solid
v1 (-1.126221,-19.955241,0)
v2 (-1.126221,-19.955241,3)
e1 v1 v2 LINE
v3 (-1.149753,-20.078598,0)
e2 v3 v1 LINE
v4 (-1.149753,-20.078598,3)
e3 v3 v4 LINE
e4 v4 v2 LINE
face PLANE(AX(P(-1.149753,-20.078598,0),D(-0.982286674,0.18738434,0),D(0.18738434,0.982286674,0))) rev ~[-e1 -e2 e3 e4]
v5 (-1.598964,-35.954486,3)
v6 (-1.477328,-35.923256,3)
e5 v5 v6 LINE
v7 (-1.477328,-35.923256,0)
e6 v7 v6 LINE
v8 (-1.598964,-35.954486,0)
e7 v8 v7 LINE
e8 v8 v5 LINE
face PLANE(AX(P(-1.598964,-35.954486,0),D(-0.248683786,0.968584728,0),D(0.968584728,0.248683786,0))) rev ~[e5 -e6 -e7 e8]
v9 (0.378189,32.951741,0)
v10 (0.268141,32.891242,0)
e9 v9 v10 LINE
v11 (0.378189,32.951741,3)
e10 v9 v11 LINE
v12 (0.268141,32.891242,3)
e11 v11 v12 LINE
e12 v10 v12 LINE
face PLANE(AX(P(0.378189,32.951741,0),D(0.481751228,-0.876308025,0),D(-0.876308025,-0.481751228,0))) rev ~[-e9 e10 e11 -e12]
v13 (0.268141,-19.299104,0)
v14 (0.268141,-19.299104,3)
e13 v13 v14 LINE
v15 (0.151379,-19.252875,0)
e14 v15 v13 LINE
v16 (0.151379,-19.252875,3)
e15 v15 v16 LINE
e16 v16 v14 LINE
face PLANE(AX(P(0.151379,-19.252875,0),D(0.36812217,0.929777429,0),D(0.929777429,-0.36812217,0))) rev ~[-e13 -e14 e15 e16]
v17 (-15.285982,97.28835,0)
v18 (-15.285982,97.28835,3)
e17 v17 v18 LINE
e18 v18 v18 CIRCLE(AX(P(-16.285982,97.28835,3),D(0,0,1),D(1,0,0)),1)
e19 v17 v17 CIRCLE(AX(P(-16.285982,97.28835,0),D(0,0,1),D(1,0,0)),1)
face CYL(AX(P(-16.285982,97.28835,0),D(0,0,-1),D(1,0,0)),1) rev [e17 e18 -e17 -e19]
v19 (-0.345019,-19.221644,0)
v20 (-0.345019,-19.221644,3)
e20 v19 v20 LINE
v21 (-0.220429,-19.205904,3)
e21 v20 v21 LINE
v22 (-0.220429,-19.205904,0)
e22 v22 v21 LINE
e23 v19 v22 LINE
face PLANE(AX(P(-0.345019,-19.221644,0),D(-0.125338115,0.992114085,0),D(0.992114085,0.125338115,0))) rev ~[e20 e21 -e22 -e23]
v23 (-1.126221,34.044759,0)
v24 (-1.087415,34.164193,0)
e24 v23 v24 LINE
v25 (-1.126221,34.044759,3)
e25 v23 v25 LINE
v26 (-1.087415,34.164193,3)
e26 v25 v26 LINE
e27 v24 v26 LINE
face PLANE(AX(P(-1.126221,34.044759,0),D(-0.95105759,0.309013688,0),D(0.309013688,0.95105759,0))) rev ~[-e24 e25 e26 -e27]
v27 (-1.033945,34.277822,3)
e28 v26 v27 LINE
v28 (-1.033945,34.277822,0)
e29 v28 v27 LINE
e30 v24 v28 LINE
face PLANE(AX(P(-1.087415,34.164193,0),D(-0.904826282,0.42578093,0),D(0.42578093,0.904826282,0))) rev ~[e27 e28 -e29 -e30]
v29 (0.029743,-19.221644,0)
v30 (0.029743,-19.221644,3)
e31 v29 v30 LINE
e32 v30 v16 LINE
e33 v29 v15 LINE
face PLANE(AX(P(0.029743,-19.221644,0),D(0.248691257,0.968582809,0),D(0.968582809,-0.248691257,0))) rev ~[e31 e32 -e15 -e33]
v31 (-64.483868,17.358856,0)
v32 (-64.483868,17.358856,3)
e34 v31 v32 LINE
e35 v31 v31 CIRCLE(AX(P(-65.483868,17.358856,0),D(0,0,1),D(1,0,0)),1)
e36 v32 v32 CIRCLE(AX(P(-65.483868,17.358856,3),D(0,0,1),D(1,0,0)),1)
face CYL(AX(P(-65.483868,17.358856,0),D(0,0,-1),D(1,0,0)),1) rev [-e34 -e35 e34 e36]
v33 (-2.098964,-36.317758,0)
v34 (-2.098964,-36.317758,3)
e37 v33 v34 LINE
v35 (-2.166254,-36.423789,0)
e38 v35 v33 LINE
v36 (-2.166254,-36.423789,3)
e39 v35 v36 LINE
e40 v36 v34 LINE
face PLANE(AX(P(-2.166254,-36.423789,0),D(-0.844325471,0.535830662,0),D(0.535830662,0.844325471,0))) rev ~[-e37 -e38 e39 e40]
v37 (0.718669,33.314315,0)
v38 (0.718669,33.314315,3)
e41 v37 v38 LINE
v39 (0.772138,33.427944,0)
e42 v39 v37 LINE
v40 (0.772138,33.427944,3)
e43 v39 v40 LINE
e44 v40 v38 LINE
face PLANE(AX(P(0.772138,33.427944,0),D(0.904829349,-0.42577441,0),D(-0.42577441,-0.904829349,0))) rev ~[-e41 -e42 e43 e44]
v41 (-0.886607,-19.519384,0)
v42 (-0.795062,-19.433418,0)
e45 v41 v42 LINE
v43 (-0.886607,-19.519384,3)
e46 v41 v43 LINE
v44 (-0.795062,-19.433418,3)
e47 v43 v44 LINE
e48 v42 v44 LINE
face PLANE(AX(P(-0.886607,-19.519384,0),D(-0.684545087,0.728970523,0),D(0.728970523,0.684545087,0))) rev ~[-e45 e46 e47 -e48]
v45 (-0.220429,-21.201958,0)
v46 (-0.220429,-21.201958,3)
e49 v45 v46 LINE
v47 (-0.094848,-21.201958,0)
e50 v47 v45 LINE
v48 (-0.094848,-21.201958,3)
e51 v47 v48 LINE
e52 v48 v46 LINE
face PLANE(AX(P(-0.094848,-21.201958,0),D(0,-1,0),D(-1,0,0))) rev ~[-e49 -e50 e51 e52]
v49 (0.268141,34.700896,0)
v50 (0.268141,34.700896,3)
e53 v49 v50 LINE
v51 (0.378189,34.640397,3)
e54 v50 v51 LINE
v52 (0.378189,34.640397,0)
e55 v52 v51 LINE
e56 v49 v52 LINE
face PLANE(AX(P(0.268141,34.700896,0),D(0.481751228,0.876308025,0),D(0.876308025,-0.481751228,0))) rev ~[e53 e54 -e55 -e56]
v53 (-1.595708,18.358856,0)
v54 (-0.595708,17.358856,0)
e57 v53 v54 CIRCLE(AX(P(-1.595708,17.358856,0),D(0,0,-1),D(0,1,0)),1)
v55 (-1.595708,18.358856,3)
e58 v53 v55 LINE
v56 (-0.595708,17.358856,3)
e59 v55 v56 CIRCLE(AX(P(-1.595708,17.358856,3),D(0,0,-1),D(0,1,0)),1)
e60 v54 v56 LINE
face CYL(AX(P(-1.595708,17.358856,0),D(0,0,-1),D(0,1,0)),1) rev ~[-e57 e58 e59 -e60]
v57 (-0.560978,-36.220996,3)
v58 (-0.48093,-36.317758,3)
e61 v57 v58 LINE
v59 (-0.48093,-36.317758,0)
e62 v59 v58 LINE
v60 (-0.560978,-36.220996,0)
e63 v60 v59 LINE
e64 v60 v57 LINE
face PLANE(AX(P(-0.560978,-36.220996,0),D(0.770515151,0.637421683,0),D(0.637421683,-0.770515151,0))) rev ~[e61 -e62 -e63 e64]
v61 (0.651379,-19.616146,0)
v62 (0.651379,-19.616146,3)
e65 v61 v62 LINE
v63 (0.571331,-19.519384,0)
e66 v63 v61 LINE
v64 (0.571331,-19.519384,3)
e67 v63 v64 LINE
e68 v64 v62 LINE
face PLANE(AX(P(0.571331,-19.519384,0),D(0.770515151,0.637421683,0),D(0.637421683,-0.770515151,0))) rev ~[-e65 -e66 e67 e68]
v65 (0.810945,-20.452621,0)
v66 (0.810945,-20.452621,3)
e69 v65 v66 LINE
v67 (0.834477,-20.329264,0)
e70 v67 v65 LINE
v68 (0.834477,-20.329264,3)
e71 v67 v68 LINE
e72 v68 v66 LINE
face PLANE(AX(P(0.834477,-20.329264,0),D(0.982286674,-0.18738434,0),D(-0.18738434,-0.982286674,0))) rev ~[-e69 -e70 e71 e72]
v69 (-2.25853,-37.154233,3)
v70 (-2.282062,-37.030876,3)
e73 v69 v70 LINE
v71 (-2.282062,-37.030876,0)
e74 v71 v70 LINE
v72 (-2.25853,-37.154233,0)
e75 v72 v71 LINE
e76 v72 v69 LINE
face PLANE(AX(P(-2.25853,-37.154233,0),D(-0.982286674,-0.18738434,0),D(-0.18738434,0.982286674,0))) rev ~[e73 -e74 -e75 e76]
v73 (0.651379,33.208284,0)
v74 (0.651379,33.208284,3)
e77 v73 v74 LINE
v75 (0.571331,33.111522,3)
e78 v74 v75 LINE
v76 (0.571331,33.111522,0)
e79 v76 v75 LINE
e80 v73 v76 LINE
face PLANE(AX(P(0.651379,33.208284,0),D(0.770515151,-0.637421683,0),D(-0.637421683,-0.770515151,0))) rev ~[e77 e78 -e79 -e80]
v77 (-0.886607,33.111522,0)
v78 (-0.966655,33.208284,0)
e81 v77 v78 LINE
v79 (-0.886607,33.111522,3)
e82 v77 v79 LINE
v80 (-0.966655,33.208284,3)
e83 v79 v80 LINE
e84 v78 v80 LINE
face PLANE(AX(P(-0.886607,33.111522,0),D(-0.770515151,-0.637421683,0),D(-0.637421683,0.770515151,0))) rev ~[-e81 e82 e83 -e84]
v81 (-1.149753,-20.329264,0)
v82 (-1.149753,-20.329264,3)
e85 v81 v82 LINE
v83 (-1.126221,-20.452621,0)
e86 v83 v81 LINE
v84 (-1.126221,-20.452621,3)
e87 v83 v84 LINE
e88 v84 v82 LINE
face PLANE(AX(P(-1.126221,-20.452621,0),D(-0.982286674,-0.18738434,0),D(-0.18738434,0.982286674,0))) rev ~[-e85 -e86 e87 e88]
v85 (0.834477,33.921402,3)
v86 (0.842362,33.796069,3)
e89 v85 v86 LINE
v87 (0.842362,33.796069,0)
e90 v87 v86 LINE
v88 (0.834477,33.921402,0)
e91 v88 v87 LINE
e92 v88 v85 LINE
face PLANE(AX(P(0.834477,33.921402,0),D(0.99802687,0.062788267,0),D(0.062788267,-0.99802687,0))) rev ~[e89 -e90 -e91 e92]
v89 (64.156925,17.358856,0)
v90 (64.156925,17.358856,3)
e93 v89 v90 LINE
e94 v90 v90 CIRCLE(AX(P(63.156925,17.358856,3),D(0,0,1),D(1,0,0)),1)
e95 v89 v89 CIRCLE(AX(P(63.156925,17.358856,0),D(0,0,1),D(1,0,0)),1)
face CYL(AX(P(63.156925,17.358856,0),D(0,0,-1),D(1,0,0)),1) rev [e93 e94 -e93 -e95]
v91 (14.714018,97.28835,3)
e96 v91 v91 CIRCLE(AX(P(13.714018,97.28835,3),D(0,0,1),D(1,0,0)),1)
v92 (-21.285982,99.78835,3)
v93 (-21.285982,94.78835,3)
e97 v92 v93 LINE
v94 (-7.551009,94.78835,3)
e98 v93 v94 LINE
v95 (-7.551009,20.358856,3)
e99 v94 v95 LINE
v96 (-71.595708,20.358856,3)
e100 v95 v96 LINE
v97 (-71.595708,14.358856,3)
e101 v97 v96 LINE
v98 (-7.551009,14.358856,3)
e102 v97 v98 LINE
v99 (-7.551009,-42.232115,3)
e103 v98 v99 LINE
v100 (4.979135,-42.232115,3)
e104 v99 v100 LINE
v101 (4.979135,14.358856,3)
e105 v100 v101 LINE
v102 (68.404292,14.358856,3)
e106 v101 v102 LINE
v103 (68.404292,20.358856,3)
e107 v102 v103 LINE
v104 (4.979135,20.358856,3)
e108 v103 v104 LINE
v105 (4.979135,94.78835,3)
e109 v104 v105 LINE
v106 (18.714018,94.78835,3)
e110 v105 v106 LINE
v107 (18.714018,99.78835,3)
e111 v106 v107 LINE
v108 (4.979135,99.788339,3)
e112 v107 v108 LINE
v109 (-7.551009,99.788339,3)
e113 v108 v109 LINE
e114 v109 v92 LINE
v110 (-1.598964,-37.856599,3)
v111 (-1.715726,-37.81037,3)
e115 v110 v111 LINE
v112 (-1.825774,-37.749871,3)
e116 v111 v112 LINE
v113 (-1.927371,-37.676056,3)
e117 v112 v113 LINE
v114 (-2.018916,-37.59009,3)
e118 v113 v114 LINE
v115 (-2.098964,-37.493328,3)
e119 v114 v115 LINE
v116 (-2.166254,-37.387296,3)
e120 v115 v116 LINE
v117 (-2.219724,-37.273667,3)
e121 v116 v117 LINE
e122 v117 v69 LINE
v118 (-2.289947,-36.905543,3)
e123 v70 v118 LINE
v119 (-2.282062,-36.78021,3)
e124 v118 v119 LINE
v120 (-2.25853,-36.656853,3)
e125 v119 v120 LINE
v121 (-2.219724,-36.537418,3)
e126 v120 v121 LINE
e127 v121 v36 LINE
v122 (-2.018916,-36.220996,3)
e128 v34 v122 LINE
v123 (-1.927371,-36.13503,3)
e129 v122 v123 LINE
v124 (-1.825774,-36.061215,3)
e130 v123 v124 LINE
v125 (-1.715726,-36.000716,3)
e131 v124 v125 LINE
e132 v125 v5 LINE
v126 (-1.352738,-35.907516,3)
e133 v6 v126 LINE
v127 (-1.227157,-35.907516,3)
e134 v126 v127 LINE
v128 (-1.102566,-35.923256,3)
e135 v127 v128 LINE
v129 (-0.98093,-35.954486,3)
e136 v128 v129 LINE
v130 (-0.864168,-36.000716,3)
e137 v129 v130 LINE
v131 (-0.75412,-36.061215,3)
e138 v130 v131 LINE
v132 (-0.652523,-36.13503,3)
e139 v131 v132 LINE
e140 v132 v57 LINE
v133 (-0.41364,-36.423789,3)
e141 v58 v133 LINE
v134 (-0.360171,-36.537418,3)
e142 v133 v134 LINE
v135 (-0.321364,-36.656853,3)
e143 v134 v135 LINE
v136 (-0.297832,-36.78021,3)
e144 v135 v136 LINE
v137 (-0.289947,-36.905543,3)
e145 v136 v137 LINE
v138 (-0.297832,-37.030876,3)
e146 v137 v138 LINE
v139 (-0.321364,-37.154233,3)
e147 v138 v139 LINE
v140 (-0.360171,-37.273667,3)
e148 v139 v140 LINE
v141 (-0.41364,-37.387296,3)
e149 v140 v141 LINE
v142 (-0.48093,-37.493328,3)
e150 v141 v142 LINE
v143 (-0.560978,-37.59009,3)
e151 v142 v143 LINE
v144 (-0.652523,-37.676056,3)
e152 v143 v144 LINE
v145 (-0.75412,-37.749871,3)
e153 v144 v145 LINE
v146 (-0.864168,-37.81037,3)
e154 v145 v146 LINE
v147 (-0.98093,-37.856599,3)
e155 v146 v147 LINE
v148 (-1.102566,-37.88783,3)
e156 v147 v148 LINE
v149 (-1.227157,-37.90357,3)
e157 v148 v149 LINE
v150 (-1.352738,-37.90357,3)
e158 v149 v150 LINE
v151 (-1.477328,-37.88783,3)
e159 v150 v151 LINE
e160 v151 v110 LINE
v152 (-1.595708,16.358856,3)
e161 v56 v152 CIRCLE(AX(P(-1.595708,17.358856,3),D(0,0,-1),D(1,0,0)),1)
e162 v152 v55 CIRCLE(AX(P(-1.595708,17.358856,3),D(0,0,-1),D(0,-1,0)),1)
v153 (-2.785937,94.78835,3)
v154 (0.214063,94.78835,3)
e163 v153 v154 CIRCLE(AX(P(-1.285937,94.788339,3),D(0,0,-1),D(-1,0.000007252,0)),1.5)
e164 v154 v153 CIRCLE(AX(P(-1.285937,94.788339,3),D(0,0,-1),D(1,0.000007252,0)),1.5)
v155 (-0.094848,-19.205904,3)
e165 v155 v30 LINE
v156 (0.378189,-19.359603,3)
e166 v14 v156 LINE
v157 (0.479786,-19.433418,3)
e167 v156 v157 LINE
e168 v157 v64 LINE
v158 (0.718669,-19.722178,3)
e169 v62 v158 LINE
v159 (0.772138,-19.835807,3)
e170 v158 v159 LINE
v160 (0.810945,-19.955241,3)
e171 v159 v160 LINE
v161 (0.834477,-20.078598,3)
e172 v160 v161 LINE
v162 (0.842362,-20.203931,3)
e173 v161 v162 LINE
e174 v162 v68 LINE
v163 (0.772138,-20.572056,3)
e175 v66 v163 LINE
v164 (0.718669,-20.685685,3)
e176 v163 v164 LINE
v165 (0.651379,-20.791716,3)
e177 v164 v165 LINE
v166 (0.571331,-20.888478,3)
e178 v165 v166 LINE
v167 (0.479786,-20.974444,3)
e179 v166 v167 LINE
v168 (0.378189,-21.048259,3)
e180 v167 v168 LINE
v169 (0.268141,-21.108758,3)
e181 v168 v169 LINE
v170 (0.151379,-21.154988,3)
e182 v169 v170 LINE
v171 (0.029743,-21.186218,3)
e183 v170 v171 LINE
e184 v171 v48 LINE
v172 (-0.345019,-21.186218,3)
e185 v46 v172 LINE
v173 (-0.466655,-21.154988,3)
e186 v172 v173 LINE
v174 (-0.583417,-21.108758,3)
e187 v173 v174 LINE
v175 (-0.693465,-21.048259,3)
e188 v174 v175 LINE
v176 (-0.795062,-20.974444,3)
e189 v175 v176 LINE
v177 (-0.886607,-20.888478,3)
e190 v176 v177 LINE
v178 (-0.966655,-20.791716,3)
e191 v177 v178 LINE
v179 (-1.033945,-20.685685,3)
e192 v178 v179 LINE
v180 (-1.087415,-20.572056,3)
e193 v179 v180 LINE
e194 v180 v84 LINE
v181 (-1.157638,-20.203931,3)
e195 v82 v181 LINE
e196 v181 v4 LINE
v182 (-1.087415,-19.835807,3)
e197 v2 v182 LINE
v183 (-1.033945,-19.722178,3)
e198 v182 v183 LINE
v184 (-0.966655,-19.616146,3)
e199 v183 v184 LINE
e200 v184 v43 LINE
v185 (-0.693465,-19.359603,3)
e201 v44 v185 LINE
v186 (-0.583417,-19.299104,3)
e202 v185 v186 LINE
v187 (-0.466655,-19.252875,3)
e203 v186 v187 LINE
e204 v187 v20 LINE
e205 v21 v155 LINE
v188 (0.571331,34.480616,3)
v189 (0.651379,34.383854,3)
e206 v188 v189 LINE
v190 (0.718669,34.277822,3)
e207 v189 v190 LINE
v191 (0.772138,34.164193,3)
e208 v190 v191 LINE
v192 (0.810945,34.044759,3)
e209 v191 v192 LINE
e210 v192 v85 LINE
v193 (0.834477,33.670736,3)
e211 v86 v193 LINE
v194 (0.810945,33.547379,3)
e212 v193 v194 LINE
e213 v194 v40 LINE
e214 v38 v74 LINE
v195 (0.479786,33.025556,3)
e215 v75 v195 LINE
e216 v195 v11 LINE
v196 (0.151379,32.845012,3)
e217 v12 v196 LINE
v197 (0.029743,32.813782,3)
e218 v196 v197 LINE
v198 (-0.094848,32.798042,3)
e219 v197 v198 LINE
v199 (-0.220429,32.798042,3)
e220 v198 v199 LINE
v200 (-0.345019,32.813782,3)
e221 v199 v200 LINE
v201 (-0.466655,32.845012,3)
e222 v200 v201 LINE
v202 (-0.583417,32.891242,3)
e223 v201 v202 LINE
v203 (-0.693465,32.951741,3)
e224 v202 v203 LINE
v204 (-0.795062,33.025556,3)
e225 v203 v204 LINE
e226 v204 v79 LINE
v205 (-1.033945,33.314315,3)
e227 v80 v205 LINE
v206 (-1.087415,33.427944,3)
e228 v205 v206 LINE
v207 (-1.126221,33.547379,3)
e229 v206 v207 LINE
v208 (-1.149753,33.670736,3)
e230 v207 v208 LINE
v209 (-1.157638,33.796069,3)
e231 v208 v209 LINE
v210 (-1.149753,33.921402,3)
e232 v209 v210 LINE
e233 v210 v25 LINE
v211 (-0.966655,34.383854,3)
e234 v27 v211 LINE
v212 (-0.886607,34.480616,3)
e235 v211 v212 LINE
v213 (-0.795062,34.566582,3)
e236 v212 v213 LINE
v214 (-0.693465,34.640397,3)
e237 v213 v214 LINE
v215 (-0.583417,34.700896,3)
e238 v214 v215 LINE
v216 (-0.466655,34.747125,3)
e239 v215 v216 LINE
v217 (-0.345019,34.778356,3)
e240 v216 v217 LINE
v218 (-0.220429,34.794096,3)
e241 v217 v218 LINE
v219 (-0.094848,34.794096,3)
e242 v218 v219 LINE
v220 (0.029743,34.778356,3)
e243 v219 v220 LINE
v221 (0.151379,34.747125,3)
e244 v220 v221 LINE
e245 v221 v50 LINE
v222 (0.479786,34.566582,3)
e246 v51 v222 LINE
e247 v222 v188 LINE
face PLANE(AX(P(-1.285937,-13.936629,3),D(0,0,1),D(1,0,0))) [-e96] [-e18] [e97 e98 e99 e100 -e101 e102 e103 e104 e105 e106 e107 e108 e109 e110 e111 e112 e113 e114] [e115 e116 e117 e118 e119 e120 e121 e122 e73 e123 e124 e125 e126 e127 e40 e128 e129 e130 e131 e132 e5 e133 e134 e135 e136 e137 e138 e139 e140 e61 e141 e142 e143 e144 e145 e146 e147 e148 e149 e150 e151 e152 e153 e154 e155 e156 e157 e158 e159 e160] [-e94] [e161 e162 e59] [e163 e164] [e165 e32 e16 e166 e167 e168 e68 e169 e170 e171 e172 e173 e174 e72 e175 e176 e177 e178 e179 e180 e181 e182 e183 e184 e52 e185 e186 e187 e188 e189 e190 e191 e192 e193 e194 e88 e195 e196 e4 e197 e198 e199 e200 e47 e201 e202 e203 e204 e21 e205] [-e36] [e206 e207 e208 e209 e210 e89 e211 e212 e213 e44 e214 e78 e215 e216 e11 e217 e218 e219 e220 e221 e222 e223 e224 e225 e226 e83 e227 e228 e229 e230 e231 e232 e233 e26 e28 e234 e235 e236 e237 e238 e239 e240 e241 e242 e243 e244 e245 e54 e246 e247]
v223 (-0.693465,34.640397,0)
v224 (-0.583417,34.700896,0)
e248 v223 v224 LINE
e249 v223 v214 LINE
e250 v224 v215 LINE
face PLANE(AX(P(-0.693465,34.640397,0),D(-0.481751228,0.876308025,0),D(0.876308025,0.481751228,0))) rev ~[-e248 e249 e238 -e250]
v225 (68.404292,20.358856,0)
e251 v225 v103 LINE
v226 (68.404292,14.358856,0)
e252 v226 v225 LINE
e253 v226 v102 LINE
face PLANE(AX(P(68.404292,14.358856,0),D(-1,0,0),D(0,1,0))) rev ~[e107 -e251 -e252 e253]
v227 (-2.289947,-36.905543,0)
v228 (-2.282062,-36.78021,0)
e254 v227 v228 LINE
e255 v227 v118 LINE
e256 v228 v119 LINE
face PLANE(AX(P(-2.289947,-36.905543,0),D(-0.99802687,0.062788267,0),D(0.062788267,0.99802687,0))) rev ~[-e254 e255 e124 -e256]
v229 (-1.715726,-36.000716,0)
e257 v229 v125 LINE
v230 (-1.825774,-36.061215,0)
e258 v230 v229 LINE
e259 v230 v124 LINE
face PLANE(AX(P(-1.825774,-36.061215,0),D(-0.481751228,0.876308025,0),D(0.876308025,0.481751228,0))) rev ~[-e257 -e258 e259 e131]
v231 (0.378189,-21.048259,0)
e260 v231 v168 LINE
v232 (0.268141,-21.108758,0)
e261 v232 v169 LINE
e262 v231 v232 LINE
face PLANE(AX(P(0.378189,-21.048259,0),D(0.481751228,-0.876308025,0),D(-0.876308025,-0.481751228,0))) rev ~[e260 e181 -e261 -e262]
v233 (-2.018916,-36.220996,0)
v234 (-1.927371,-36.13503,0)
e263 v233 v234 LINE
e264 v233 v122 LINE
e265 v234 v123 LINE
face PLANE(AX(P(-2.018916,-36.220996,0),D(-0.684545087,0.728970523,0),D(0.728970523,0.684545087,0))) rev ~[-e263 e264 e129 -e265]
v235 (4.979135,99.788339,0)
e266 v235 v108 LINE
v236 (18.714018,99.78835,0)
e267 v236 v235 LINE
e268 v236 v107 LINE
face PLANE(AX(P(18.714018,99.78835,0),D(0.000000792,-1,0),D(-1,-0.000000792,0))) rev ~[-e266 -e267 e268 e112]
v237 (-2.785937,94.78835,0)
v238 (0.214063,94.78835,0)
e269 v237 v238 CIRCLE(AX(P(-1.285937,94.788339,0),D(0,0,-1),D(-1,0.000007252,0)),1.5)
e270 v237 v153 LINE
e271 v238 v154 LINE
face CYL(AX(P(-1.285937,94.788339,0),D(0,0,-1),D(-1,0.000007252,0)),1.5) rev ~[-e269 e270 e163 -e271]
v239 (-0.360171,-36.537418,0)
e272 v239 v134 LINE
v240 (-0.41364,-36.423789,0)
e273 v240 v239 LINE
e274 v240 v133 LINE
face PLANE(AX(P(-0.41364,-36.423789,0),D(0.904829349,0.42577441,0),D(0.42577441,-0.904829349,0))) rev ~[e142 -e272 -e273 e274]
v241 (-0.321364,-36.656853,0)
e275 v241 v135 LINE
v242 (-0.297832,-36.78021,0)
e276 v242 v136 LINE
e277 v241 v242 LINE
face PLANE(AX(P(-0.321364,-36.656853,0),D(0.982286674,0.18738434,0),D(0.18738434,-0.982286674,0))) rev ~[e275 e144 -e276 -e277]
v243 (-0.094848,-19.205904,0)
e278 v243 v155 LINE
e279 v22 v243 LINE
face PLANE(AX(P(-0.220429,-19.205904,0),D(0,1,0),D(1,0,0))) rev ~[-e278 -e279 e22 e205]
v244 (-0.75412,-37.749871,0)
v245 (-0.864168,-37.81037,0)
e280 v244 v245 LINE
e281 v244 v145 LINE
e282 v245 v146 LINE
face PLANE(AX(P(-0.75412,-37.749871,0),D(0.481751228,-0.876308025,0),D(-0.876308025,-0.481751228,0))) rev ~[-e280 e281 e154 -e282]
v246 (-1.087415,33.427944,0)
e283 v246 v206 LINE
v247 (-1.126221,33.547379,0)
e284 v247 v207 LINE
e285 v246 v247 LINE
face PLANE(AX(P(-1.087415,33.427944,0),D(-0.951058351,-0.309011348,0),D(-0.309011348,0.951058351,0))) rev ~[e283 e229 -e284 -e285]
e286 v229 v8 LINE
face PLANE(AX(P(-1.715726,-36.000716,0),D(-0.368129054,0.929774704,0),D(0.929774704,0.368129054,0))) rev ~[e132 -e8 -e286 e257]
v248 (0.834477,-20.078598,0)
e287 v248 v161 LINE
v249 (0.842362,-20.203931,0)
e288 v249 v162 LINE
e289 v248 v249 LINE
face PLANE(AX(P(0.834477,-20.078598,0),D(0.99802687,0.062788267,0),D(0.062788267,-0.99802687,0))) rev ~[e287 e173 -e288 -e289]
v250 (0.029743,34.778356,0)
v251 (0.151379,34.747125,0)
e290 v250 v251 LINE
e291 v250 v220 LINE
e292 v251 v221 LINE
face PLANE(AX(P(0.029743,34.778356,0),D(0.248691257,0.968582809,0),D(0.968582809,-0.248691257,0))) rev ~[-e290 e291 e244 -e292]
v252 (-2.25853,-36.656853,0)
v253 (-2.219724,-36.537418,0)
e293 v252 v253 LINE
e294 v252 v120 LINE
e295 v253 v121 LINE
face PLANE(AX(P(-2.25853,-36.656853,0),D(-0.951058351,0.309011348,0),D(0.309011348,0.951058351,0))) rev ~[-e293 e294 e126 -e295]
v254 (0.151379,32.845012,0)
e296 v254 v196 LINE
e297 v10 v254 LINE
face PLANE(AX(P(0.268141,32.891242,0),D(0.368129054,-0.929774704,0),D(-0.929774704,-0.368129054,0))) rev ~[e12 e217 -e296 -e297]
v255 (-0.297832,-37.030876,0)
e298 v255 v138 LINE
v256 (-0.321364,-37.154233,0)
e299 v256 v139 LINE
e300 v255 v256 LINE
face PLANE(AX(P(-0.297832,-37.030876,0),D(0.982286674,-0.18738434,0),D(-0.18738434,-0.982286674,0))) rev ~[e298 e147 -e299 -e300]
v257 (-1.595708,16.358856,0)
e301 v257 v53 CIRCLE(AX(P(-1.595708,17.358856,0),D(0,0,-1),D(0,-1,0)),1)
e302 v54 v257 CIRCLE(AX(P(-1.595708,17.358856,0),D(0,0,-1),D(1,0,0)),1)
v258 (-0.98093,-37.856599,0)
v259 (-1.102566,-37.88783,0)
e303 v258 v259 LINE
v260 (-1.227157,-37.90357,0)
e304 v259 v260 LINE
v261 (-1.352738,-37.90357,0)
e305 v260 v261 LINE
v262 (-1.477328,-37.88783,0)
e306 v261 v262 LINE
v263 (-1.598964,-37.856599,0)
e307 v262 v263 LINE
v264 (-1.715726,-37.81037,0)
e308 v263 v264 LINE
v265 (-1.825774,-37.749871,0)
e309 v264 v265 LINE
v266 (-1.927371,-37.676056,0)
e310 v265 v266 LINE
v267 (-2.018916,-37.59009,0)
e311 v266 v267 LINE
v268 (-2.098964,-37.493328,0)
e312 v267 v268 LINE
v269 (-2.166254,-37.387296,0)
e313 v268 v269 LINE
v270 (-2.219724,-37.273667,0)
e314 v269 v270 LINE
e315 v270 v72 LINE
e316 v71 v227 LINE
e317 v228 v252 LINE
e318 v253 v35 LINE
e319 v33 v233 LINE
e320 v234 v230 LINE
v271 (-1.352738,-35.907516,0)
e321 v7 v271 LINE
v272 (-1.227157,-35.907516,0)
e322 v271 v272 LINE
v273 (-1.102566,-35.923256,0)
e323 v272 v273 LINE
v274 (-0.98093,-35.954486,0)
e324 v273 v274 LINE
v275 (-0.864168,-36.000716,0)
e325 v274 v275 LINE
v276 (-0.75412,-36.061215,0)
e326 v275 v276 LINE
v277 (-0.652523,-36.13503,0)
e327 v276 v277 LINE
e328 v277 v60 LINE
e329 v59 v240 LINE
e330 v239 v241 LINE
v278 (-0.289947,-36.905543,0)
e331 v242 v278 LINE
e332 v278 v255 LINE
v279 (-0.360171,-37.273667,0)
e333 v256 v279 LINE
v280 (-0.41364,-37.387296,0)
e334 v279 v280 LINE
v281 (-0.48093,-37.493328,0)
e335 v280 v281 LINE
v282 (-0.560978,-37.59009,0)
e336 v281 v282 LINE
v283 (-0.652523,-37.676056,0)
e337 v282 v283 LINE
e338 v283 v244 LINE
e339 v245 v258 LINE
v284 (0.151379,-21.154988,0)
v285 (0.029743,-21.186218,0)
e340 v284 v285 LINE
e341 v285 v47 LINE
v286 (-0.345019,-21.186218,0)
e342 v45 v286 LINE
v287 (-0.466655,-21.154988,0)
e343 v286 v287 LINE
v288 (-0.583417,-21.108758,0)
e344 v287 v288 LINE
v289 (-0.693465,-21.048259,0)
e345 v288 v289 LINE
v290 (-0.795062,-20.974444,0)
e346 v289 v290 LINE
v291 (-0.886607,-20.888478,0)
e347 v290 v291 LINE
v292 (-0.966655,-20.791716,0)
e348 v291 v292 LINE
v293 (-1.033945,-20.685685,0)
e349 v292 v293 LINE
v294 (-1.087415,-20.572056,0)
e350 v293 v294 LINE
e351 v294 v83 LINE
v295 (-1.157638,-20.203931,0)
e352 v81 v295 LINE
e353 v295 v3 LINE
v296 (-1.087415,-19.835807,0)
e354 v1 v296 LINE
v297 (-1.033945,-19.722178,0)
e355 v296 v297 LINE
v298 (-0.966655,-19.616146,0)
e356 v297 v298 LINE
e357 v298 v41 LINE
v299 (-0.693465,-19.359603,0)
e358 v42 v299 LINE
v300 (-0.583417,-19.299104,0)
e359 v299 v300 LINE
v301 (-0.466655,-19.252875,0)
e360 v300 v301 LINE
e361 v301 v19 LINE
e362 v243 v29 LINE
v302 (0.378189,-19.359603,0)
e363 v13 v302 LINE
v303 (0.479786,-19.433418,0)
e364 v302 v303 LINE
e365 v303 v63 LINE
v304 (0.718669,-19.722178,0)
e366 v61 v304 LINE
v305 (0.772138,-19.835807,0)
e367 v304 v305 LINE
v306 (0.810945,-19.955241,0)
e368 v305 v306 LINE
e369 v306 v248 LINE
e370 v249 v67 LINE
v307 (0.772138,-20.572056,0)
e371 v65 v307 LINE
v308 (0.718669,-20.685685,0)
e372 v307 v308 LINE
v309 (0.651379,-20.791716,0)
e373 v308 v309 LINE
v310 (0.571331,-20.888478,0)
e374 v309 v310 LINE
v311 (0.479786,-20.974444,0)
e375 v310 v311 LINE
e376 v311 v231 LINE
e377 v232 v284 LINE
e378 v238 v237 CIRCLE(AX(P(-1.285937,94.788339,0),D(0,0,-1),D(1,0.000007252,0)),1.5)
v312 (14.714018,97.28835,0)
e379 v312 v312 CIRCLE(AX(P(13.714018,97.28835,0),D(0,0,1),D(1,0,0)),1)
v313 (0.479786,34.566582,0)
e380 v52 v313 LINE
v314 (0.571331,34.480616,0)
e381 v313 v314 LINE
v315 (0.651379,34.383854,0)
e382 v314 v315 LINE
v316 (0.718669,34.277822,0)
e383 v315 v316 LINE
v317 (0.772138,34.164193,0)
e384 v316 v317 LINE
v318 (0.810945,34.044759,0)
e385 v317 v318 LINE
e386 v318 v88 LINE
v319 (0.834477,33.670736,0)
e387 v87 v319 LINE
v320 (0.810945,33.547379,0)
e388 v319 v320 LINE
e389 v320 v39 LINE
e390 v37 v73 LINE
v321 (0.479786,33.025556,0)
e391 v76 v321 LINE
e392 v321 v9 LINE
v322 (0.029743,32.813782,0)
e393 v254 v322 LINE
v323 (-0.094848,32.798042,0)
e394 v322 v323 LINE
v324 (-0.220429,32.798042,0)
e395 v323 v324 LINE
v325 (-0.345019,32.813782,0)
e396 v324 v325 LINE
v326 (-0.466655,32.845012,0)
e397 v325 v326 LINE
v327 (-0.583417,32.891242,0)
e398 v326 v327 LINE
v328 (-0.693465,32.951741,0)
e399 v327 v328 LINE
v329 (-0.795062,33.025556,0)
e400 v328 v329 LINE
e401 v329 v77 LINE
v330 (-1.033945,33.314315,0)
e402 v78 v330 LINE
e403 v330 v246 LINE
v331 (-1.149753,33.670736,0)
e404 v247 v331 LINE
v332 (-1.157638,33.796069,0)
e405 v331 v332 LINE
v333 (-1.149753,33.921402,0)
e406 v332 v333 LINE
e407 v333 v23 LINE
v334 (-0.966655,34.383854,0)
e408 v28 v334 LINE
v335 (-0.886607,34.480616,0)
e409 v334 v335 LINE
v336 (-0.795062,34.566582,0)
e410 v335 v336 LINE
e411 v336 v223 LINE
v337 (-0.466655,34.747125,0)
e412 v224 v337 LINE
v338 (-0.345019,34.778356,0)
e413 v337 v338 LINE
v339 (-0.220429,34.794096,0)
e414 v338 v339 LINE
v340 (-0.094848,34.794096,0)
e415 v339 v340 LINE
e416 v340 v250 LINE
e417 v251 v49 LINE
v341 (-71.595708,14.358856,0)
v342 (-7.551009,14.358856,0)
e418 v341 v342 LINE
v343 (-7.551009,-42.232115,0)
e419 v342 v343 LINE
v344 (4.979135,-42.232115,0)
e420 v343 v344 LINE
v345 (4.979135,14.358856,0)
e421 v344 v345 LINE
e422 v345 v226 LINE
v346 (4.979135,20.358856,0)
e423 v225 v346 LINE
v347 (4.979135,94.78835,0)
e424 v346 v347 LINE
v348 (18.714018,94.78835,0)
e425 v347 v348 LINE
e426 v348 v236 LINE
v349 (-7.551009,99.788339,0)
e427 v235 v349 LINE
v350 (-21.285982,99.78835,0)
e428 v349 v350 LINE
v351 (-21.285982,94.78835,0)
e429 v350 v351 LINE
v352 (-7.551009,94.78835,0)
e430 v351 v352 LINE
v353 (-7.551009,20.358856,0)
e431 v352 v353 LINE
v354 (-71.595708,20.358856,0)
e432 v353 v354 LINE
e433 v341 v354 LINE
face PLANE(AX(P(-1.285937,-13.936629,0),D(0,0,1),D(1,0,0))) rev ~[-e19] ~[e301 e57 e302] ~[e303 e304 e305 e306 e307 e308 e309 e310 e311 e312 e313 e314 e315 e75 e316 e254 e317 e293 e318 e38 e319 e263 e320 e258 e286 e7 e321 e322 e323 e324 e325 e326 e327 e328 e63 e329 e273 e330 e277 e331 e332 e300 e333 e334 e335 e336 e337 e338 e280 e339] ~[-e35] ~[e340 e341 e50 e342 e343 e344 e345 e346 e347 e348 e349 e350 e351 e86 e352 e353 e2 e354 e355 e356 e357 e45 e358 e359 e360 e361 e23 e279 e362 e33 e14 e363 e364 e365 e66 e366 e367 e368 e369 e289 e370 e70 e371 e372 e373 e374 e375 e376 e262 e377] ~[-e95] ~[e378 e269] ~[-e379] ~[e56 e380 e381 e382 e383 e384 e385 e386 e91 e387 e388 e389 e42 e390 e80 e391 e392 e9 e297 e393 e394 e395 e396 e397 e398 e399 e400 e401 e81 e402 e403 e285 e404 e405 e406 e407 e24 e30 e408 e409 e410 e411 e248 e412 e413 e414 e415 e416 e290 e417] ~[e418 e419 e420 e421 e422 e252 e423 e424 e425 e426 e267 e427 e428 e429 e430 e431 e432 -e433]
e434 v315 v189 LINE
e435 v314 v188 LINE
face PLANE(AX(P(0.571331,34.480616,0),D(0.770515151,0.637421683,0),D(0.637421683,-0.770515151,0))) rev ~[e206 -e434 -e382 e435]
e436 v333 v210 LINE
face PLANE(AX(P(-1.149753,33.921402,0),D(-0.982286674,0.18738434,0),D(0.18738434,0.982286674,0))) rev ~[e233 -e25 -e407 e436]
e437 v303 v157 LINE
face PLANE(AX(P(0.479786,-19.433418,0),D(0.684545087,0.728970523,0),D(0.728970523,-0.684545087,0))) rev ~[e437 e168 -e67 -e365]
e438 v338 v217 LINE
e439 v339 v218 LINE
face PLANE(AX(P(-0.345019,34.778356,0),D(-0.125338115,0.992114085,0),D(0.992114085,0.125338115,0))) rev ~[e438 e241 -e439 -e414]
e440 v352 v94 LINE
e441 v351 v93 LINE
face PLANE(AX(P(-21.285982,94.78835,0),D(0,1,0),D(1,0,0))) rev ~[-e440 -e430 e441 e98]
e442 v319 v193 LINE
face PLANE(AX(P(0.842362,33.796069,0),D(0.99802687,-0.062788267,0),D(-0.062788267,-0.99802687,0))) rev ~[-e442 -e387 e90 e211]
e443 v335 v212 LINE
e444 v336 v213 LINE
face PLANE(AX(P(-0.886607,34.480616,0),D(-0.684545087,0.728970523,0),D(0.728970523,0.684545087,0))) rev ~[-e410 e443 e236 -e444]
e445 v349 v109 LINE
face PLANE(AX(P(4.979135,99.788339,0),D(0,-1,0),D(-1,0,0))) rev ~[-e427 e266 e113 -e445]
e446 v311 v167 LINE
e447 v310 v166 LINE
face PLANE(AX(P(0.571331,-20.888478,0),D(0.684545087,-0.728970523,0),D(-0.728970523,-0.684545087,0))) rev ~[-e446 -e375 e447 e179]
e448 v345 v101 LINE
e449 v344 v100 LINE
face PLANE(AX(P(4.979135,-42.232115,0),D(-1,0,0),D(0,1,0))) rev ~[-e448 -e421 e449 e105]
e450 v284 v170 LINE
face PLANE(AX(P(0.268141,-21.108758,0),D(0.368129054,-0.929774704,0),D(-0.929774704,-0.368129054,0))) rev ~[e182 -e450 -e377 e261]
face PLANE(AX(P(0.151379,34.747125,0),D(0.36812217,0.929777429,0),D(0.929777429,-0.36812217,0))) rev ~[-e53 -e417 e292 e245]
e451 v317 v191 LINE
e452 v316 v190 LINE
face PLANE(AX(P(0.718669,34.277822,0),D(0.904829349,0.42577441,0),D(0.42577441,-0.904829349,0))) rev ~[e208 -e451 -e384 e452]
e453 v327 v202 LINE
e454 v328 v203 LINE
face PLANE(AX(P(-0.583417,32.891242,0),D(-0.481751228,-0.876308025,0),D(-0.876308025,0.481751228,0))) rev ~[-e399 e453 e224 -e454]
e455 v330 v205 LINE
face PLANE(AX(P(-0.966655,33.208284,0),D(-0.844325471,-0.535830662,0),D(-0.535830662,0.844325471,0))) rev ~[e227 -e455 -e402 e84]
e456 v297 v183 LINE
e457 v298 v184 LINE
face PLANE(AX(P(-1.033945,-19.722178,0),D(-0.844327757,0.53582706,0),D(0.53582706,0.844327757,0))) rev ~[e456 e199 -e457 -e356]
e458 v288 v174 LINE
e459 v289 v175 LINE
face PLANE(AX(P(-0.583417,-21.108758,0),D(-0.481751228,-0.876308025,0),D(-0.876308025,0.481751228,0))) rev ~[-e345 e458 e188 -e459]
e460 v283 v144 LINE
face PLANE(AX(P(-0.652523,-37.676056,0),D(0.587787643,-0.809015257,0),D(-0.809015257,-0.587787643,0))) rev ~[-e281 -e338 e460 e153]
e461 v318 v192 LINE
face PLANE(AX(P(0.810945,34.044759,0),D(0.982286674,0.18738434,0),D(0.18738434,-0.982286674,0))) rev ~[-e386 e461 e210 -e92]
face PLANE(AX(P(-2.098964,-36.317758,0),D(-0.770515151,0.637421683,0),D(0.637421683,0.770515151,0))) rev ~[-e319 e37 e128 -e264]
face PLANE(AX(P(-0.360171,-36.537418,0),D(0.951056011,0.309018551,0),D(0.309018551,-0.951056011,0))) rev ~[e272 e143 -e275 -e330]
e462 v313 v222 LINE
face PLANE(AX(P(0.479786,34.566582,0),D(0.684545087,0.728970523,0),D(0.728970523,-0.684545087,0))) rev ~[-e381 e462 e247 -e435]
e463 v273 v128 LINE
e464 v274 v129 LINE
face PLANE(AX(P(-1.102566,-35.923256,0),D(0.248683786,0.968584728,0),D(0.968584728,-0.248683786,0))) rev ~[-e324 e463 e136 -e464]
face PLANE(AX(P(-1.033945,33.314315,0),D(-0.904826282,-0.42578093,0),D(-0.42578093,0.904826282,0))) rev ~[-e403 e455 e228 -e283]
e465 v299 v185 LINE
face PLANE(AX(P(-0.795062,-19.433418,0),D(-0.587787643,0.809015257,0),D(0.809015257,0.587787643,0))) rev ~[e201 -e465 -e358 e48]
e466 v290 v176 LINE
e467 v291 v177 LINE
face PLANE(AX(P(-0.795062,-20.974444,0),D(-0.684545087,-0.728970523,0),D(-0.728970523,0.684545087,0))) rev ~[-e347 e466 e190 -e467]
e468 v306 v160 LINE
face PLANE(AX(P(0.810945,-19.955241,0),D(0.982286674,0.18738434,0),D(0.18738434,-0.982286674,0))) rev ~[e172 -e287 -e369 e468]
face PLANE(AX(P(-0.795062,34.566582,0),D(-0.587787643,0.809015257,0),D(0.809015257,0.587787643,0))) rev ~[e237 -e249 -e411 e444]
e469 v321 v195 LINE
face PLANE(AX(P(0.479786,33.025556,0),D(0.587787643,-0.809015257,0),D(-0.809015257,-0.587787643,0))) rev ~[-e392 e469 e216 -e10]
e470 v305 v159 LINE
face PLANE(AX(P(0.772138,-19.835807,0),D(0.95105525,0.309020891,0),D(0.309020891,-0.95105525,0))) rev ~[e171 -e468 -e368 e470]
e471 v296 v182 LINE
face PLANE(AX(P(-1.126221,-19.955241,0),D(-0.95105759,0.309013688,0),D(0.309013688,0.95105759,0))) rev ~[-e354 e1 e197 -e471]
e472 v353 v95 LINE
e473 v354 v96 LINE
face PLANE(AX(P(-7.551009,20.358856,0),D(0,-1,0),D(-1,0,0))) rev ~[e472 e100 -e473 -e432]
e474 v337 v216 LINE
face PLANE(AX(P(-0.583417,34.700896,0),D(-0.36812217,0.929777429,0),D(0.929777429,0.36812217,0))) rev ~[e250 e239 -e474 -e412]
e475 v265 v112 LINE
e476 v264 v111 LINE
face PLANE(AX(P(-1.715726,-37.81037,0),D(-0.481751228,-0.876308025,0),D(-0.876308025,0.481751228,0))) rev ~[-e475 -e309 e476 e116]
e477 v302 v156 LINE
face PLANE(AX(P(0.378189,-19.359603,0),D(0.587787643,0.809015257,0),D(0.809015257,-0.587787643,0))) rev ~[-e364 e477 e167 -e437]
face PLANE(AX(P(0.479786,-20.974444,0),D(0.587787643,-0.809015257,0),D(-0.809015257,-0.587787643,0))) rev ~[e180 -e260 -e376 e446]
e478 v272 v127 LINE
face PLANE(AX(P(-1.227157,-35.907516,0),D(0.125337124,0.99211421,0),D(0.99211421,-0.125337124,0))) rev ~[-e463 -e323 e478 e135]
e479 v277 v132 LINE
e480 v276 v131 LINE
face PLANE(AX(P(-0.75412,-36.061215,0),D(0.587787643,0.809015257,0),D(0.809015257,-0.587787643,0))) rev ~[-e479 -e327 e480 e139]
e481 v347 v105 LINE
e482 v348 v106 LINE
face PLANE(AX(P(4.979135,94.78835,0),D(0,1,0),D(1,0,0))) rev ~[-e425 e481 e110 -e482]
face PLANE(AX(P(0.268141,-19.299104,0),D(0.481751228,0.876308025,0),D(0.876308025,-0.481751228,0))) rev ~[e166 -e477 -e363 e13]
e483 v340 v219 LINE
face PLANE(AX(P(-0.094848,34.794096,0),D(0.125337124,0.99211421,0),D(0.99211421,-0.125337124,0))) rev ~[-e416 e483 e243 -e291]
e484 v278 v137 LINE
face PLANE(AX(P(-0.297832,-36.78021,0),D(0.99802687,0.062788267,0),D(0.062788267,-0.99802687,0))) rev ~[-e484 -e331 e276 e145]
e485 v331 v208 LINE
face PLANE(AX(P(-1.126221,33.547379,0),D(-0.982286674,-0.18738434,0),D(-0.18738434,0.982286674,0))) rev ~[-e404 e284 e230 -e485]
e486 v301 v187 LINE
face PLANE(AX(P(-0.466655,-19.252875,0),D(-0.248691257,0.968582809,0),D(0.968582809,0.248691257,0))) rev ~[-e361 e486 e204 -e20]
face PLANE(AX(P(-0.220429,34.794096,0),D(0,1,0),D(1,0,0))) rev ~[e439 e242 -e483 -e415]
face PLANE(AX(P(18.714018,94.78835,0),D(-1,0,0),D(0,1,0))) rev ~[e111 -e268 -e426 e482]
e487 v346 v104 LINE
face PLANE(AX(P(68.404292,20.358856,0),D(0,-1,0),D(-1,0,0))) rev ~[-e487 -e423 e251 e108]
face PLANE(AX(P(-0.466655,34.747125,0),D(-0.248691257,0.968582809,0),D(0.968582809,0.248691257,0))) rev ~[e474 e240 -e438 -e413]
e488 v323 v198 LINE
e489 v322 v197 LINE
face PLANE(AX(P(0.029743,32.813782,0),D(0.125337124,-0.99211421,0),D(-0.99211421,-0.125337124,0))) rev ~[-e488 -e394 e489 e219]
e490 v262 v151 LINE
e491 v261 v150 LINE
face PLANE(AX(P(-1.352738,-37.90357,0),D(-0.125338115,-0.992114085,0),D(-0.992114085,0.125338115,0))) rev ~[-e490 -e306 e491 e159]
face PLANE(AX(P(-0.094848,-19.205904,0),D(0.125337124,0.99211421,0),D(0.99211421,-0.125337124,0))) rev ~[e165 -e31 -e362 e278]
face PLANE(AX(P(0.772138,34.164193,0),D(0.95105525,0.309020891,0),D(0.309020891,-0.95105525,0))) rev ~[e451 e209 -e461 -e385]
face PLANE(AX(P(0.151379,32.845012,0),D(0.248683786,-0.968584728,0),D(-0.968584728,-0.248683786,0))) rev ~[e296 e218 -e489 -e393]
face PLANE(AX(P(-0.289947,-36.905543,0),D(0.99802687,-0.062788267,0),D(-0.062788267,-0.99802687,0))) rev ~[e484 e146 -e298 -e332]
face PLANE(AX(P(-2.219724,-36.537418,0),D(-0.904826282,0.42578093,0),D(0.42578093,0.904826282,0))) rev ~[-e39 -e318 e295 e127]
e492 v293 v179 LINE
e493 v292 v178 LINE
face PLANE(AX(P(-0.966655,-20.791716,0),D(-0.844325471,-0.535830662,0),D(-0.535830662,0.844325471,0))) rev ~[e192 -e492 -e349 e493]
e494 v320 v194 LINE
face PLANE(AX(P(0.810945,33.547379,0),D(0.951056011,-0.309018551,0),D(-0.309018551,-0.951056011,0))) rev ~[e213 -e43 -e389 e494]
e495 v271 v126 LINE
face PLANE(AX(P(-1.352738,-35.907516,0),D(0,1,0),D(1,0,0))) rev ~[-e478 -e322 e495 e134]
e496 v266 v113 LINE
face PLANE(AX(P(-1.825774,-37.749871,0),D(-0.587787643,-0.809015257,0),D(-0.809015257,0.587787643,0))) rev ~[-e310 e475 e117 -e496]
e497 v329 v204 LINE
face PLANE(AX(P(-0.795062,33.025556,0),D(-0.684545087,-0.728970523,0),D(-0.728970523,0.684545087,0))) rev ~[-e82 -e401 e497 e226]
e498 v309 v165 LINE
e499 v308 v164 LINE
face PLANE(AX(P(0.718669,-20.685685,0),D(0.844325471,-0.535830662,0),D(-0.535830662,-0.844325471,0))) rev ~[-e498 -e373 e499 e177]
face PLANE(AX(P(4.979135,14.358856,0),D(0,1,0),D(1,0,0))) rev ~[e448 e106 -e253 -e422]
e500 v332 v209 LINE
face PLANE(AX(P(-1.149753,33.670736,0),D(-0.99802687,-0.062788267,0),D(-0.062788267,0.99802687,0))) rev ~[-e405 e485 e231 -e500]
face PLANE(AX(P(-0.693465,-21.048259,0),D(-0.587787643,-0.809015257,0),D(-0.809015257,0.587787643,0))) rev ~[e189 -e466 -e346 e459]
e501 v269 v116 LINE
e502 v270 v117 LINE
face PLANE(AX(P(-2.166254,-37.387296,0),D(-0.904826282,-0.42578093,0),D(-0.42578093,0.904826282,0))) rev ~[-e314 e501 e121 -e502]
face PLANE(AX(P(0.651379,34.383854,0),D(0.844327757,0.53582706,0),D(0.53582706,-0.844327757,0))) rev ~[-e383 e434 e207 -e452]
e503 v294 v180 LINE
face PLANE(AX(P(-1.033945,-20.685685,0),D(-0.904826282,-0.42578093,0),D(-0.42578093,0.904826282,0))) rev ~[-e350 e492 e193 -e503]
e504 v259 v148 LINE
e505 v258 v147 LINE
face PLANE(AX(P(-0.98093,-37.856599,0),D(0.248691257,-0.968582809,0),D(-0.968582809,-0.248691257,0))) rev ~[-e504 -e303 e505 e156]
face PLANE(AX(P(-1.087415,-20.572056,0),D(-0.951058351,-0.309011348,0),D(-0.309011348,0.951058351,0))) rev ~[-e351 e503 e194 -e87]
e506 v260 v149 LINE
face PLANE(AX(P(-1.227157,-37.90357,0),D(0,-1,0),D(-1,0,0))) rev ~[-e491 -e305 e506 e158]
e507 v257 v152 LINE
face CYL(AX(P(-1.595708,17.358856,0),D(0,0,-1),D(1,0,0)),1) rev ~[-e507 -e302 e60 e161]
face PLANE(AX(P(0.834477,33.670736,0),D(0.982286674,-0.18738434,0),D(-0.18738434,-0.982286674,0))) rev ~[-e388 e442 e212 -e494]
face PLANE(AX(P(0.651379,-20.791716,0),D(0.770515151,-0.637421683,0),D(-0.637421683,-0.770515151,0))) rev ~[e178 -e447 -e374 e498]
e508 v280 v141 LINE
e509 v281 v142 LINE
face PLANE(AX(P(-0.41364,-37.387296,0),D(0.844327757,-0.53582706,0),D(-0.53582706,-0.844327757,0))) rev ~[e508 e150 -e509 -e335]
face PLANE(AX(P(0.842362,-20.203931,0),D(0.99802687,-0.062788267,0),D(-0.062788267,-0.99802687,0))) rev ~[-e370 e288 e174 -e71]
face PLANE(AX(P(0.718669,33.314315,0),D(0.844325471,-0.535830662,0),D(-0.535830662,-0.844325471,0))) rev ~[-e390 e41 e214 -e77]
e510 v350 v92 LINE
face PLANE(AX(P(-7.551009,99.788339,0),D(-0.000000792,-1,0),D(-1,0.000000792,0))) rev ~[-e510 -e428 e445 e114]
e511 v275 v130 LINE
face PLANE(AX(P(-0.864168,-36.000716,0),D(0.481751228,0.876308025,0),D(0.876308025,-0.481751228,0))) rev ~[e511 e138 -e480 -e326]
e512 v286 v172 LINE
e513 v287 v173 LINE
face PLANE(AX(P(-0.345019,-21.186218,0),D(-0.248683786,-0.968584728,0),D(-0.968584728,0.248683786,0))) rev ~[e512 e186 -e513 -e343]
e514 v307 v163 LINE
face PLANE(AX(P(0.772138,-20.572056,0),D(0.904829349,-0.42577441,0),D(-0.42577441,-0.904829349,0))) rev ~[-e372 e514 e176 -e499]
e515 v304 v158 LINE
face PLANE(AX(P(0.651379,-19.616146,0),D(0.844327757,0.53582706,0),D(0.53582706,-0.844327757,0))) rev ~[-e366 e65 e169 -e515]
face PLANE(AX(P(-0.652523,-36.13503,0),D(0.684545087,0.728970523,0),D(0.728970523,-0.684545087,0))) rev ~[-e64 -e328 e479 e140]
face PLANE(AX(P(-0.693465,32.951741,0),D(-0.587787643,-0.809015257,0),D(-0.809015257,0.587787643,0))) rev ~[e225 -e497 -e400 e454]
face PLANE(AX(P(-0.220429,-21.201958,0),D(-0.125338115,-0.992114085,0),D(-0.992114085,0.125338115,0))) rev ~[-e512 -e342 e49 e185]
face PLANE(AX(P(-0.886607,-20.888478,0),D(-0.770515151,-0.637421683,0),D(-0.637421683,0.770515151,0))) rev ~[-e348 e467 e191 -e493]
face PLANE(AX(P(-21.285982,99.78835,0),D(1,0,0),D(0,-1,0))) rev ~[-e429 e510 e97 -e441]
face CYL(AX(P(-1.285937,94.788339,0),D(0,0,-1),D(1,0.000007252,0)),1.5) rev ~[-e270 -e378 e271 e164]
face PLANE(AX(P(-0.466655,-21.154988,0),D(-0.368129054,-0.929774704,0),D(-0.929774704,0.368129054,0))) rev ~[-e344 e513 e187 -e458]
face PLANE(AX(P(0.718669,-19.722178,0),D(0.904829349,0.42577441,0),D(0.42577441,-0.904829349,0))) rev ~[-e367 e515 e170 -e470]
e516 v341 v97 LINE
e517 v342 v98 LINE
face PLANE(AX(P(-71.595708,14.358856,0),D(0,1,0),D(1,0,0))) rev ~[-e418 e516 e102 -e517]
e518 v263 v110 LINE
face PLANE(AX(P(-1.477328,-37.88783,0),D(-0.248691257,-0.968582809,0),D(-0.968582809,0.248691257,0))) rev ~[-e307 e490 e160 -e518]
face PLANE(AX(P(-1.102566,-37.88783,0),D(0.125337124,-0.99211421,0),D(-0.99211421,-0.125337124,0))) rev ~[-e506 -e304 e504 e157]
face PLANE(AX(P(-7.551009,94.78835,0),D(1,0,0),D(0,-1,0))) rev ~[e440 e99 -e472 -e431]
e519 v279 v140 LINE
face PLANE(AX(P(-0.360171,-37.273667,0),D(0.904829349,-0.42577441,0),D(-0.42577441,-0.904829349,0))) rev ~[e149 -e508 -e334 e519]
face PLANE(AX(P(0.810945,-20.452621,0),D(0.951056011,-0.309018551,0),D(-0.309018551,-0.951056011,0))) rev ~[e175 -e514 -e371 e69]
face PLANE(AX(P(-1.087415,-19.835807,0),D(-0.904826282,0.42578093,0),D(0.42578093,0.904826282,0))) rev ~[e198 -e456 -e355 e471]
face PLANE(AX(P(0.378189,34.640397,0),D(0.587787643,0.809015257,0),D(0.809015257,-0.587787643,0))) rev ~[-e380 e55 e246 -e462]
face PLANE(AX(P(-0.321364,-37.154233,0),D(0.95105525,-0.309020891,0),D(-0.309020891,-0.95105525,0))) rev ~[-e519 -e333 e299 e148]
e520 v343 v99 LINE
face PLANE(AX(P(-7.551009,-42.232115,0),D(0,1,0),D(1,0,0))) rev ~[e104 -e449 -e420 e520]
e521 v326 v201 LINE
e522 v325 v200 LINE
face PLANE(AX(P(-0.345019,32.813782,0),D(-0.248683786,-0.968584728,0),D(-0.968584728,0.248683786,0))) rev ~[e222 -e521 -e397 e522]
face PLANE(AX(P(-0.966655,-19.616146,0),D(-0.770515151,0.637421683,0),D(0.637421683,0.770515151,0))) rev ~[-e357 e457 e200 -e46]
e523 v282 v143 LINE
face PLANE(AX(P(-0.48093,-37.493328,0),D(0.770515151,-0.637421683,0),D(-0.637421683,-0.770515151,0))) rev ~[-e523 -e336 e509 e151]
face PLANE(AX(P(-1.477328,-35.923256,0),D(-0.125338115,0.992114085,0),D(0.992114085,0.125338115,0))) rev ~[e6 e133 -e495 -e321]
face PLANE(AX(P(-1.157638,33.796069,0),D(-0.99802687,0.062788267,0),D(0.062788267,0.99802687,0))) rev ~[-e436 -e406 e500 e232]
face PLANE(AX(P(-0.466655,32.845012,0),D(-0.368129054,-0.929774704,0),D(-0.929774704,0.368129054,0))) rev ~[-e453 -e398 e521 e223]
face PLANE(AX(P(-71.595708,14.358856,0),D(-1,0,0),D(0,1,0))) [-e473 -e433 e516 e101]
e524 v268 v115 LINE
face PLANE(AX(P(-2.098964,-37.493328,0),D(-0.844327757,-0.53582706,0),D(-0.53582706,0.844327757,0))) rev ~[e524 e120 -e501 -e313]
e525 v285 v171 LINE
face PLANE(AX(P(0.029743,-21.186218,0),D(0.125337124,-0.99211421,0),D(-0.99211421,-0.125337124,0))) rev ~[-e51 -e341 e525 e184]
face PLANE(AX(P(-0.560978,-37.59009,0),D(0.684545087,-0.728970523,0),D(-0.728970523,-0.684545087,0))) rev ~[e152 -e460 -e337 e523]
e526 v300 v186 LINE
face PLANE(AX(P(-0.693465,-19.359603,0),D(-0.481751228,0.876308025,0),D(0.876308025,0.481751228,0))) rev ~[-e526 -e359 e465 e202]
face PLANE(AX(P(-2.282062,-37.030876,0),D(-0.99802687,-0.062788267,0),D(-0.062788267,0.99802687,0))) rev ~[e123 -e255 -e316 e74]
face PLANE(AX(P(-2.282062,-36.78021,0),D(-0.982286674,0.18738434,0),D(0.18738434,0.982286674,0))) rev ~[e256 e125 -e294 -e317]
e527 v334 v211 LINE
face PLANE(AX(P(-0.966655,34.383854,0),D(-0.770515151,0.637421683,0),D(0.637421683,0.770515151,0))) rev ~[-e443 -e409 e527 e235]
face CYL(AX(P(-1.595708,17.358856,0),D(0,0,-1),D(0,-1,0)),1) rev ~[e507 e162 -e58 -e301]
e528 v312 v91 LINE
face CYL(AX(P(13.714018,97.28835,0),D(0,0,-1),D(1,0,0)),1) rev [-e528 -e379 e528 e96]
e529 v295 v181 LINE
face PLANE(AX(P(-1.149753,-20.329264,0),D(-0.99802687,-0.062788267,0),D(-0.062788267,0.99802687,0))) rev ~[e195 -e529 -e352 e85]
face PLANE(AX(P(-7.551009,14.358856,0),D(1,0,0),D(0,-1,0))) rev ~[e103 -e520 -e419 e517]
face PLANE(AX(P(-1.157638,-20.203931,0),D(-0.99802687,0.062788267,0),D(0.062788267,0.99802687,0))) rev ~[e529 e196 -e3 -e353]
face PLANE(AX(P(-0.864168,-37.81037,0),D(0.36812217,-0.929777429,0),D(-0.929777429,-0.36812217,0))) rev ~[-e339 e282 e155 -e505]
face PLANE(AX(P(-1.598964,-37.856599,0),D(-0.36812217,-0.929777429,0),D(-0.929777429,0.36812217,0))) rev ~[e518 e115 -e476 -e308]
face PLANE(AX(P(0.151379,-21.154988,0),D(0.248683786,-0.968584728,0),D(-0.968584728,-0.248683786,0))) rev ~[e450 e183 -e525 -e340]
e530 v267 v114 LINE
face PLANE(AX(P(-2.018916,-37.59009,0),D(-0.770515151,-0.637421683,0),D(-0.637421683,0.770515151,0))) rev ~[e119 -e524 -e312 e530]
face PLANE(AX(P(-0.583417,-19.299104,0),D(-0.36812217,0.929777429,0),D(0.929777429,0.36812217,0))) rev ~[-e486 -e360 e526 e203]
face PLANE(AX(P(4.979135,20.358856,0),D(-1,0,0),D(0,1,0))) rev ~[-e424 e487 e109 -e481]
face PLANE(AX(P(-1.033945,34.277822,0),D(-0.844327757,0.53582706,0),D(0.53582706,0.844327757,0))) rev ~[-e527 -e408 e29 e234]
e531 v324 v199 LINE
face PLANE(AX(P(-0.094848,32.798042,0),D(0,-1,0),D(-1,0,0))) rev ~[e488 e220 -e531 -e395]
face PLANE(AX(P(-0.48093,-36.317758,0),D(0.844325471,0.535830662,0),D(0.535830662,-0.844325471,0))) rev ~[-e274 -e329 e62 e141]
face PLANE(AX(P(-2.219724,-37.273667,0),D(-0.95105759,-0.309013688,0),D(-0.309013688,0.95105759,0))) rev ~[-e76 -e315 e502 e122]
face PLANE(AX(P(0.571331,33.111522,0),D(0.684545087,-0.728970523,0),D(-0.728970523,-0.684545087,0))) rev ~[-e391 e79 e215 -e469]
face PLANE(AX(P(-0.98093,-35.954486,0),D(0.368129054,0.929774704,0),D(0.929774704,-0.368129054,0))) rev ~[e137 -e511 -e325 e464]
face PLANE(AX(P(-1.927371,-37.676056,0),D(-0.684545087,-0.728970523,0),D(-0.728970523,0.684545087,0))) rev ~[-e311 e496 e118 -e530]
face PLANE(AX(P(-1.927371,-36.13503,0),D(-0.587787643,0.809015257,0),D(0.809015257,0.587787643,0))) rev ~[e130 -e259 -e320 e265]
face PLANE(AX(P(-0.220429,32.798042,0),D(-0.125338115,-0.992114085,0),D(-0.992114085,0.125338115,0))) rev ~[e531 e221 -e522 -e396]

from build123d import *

# Parameters (mm, degrees)
F0_W     = 64.0446986989
F0_H     = 6
F0_R     = 1
F0_W_2   = 63.4251574627
F1_DEPTH = 3


# Not quite as in the source:
# - ends of sketch curves that miss each other by under 0.0002 mm in the source are joined
# - a feature names something its author has since deleted; it is built from what else it names


with BuildPart() as f1:
    # F0 (on Top) → F1 (new body)
    with BuildSketch(Plane.XY):
        Polygon((-7.5510093011, -42.2321148217), (-1.289947, -42.2321148217), (4.9791345373, -42.2321148217), (4.9791345373, 14.358856), (-1.595708, 14.358856), (-7.5510093011, 14.358856), align=None)
        Polygon((-0.297832, -36.78021), (-0.289947, -36.905543), (-0.297832, -37.030876), (-0.321364, -37.154233), (-0.360171, -37.273667), (-0.41364, -37.387296), (-0.48093, -37.493328), (-0.560978, -37.59009), (-0.652523, -37.676056), (-0.75412, -37.749871), (-0.864168, -37.81037), (-0.98093, -37.856599), (-1.102566, -37.88783), (-1.227157, -37.90357), (-1.352738, -37.90357), (-1.477328, -37.88783), (-1.598964, -37.856599), (-1.715726, -37.81037), (-1.825774, -37.749871), (-1.927371, -37.676056), (-2.018916, -37.59009), (-2.098964, -37.493328), (-2.166254, -37.387296), (-2.219724, -37.273667), (-2.25853, -37.154233), (-2.282062, -37.030876), (-2.289947, -36.905543), (-2.282062, -36.78021), (-2.25853, -36.656853), (-2.219724, -36.537418), (-2.166254, -36.423789), (-2.098964, -36.317758), (-2.018916, -36.220996), (-1.927371, -36.13503), (-1.825774, -36.061215), (-1.715726, -36.000716), (-1.598964, -35.954486), (-1.477328, -35.923256), (-1.352738, -35.907516), (-1.227157, -35.907516), (-1.102566, -35.923256), (-0.98093, -35.954486), (-0.864168, -36.000716), (-0.75412, -36.061215), (-0.652523, -36.13503), (-0.560978, -36.220996), (-0.48093, -36.317758), (-0.41364, -36.423789), (-0.360171, -36.537418), (-0.321364, -36.656853), align=None, mode=Mode.SUBTRACT)
        Polygon((0.834477, -20.078598), (0.842362, -20.203931), (0.834477, -20.329264), (0.810945, -20.452621), (0.772138, -20.572056), (0.718669, -20.685685), (0.651379, -20.791716), (0.571331, -20.888478), (0.479786, -20.974444), (0.378189, -21.048259), (0.268141, -21.108758), (0.151379, -21.154988), (0.029743, -21.186218), (-0.094848, -21.201958), (-0.220429, -21.201958), (-0.345019, -21.186218), (-0.466655, -21.154988), (-0.583417, -21.108758), (-0.693465, -21.048259), (-0.795062, -20.974444), (-0.886607, -20.888478), (-0.966655, -20.791716), (-1.033945, -20.685685), (-1.087415, -20.572056), (-1.126221, -20.452621), (-1.149753, -20.329264), (-1.157638, -20.203931), (-1.149753, -20.078598), (-1.126221, -19.955241), (-1.087415, -19.835807), (-1.033945, -19.722178), (-0.966655, -19.616146), (-0.886607, -19.519384), (-0.795062, -19.433418), (-0.693465, -19.359603), (-0.583417, -19.299104), (-0.466655, -19.252875), (-0.345019, -19.221644), (-0.220429, -19.205904), (-0.094848, -19.205904), (0.029743, -19.221644), (0.151379, -19.252875), (0.268141, -19.299104), (0.378189, -19.359603), (0.479786, -19.433418), (0.571331, -19.519384), (0.651379, -19.616146), (0.718669, -19.722178), (0.772138, -19.835807), (0.810945, -19.955241), align=None, mode=Mode.SUBTRACT)
        with Locations((-39.5733586505, 17.358856)):
            Rectangle(F0_W, F0_H)
        with Locations((-65.4838681221, 17.358856)):
            Circle(F0_R, mode=Mode.SUBTRACT)
        with BuildLine():
            Line((-7.5510093011, 20.358856), (-7.5510093011, 14.358856))
            Line((-7.5510093011, 14.358856), (-1.595708, 14.358856))
            Line((-1.595708, 14.358856), (-1.595708, 16.358856))
            ThreePointArc((-1.595708, 16.358856), (-2.595708, 17.358856), (-1.595708, 18.358856))
            Line((-1.595708, 18.358856), (-1.595708, 20.358856))
            Line((-1.595708, 20.358856), (-7.5510093011, 20.358856))
        make_face()
        with BuildLine():
            Line((-1.595708, 14.358856), (4.9791345373, 14.358856))
            Line((4.9791345373, 14.358856), (4.9791345373, 20.358856))
            Line((4.9791345373, 20.358856), (-1.595708, 20.358856))
            Line((-1.595708, 20.358856), (-1.595708, 18.358856))
            ThreePointArc((-1.595708, 18.358856), (-0.8886012188, 18.0659627812), (-0.595708, 17.358856))
            ThreePointArc((-0.595708, 17.358856), (-0.8886012188, 16.6517492188), (-1.595708, 16.358856))
            Line((-1.595708, 16.358856), (-1.595708, 14.358856))
        make_face()
        with Locations((36.6917132686, 17.358856)):
            Rectangle(F0_W_2, F0_H)
        with Locations((63.1569251418, 17.358856)):
            Circle(F0_R, mode=Mode.SUBTRACT)
        Polygon((-7.5510093011, 39.788339287), (-7.5510093011, 20.358856), (-1.595708, 20.358856), (4.9791345373, 20.358856), (4.9791345373, 28.8824737072), (4.9791345373, 39.788339287), (-1.289947, 39.788339287), align=None)
        Polygon((0.834477, 33.921402), (0.842362, 33.796069), (0.834477, 33.670736), (0.810945, 33.547379), (0.772138, 33.427944), (0.718669, 33.314315), (0.651379, 33.208284), (0.571331, 33.111522), (0.479786, 33.025556), (0.378189, 32.951741), (0.268141, 32.891242), (0.151379, 32.845012), (0.029743, 32.813782), (-0.094848, 32.798042), (-0.220429, 32.798042), (-0.345019, 32.813782), (-0.466655, 32.845012), (-0.583417, 32.891242), (-0.693465, 32.951741), (-0.795062, 33.025556), (-0.886607, 33.111522), (-0.966655, 33.208284), (-1.033945, 33.314315), (-1.087415, 33.427944), (-1.126221, 33.547379), (-1.149753, 33.670736), (-1.157638, 33.796069), (-1.149753, 33.921402), (-1.126221, 34.044759), (-1.087415, 34.164193), (-1.033945, 34.277822), (-0.966655, 34.383854), (-0.886607, 34.480616), (-0.795062, 34.566582), (-0.693465, 34.640397), (-0.583417, 34.700896), (-0.466655, 34.747125), (-0.345019, 34.778356), (-0.220429, 34.794096), (-0.094848, 34.794096), (0.029743, 34.778356), (0.151379, 34.747125), (0.268141, 34.700896), (0.378189, 34.640397), (0.479786, 34.566582), (0.571331, 34.480616), (0.651379, 34.383854), (0.718669, 34.277822), (0.772138, 34.164193), (0.810945, 34.044759), align=None, mode=Mode.SUBTRACT)
        with BuildLine():
            Line((-7.5510093011, 94.7883501649), (-7.5510093011, 39.788339287))
            Line((-7.5510093011, 39.788339287), (-1.289947, 39.788339287))
            Line((-1.289947, 39.788339287), (4.9791345373, 39.788339287))
            Line((4.9791345373, 39.788339287), (4.9791345373, 94.7883501649))
            Line((4.9791345373, 94.7883501649), (0.2140626181, 94.7883501649))
            ThreePointArc((0.2140626181, 94.7883501649), (-1.2859428208, 93.2883392871), (-2.7859373819, 94.7883501649))
            Line((-2.7859373819, 94.7883501649), (-7.5510093011, 94.7883501649))
        make_face()
        Polygon((-21.2859819876, 94.7883501649), (-7.5510093011, 94.7883501649), (-7.5510093011, 99.788339287), (-21.2859819876, 99.7883501649), align=None)
        with Locations((-16.2859819876, 97.2883501649)):
            Circle(F0_R, mode=Mode.SUBTRACT)
        with BuildLine():
            Line((-7.5510093011, 99.788339287), (-7.5510093011, 94.7883501649))
            Line((-7.5510093011, 94.7883501649), (-2.7859373819, 94.7883501649))
            ThreePointArc((-2.7859373819, 94.7883501649), (-1.285931943, 96.288339287), (0.2140626181, 94.788339287))
            Line((0.2140626181, 94.788339287), (4.9791345373, 94.7883501649))
            Line((4.9791345373, 94.7883501649), (4.9791345373, 99.788339287))
            Line((4.9791345373, 99.788339287), (-7.5510093011, 99.788339287))
        make_face()
        Polygon((4.9791345373, 99.788339287), (4.9791345373, 94.7883501649), (18.7140180124, 94.7883501649), (18.7140180124, 99.7883501649), align=None)
        with Locations((13.7140180124, 97.2883501649)):
            Circle(F0_R, mode=Mode.SUBTRACT)
    extrude(amount=F1_DEPTH)


solid = f1.part
